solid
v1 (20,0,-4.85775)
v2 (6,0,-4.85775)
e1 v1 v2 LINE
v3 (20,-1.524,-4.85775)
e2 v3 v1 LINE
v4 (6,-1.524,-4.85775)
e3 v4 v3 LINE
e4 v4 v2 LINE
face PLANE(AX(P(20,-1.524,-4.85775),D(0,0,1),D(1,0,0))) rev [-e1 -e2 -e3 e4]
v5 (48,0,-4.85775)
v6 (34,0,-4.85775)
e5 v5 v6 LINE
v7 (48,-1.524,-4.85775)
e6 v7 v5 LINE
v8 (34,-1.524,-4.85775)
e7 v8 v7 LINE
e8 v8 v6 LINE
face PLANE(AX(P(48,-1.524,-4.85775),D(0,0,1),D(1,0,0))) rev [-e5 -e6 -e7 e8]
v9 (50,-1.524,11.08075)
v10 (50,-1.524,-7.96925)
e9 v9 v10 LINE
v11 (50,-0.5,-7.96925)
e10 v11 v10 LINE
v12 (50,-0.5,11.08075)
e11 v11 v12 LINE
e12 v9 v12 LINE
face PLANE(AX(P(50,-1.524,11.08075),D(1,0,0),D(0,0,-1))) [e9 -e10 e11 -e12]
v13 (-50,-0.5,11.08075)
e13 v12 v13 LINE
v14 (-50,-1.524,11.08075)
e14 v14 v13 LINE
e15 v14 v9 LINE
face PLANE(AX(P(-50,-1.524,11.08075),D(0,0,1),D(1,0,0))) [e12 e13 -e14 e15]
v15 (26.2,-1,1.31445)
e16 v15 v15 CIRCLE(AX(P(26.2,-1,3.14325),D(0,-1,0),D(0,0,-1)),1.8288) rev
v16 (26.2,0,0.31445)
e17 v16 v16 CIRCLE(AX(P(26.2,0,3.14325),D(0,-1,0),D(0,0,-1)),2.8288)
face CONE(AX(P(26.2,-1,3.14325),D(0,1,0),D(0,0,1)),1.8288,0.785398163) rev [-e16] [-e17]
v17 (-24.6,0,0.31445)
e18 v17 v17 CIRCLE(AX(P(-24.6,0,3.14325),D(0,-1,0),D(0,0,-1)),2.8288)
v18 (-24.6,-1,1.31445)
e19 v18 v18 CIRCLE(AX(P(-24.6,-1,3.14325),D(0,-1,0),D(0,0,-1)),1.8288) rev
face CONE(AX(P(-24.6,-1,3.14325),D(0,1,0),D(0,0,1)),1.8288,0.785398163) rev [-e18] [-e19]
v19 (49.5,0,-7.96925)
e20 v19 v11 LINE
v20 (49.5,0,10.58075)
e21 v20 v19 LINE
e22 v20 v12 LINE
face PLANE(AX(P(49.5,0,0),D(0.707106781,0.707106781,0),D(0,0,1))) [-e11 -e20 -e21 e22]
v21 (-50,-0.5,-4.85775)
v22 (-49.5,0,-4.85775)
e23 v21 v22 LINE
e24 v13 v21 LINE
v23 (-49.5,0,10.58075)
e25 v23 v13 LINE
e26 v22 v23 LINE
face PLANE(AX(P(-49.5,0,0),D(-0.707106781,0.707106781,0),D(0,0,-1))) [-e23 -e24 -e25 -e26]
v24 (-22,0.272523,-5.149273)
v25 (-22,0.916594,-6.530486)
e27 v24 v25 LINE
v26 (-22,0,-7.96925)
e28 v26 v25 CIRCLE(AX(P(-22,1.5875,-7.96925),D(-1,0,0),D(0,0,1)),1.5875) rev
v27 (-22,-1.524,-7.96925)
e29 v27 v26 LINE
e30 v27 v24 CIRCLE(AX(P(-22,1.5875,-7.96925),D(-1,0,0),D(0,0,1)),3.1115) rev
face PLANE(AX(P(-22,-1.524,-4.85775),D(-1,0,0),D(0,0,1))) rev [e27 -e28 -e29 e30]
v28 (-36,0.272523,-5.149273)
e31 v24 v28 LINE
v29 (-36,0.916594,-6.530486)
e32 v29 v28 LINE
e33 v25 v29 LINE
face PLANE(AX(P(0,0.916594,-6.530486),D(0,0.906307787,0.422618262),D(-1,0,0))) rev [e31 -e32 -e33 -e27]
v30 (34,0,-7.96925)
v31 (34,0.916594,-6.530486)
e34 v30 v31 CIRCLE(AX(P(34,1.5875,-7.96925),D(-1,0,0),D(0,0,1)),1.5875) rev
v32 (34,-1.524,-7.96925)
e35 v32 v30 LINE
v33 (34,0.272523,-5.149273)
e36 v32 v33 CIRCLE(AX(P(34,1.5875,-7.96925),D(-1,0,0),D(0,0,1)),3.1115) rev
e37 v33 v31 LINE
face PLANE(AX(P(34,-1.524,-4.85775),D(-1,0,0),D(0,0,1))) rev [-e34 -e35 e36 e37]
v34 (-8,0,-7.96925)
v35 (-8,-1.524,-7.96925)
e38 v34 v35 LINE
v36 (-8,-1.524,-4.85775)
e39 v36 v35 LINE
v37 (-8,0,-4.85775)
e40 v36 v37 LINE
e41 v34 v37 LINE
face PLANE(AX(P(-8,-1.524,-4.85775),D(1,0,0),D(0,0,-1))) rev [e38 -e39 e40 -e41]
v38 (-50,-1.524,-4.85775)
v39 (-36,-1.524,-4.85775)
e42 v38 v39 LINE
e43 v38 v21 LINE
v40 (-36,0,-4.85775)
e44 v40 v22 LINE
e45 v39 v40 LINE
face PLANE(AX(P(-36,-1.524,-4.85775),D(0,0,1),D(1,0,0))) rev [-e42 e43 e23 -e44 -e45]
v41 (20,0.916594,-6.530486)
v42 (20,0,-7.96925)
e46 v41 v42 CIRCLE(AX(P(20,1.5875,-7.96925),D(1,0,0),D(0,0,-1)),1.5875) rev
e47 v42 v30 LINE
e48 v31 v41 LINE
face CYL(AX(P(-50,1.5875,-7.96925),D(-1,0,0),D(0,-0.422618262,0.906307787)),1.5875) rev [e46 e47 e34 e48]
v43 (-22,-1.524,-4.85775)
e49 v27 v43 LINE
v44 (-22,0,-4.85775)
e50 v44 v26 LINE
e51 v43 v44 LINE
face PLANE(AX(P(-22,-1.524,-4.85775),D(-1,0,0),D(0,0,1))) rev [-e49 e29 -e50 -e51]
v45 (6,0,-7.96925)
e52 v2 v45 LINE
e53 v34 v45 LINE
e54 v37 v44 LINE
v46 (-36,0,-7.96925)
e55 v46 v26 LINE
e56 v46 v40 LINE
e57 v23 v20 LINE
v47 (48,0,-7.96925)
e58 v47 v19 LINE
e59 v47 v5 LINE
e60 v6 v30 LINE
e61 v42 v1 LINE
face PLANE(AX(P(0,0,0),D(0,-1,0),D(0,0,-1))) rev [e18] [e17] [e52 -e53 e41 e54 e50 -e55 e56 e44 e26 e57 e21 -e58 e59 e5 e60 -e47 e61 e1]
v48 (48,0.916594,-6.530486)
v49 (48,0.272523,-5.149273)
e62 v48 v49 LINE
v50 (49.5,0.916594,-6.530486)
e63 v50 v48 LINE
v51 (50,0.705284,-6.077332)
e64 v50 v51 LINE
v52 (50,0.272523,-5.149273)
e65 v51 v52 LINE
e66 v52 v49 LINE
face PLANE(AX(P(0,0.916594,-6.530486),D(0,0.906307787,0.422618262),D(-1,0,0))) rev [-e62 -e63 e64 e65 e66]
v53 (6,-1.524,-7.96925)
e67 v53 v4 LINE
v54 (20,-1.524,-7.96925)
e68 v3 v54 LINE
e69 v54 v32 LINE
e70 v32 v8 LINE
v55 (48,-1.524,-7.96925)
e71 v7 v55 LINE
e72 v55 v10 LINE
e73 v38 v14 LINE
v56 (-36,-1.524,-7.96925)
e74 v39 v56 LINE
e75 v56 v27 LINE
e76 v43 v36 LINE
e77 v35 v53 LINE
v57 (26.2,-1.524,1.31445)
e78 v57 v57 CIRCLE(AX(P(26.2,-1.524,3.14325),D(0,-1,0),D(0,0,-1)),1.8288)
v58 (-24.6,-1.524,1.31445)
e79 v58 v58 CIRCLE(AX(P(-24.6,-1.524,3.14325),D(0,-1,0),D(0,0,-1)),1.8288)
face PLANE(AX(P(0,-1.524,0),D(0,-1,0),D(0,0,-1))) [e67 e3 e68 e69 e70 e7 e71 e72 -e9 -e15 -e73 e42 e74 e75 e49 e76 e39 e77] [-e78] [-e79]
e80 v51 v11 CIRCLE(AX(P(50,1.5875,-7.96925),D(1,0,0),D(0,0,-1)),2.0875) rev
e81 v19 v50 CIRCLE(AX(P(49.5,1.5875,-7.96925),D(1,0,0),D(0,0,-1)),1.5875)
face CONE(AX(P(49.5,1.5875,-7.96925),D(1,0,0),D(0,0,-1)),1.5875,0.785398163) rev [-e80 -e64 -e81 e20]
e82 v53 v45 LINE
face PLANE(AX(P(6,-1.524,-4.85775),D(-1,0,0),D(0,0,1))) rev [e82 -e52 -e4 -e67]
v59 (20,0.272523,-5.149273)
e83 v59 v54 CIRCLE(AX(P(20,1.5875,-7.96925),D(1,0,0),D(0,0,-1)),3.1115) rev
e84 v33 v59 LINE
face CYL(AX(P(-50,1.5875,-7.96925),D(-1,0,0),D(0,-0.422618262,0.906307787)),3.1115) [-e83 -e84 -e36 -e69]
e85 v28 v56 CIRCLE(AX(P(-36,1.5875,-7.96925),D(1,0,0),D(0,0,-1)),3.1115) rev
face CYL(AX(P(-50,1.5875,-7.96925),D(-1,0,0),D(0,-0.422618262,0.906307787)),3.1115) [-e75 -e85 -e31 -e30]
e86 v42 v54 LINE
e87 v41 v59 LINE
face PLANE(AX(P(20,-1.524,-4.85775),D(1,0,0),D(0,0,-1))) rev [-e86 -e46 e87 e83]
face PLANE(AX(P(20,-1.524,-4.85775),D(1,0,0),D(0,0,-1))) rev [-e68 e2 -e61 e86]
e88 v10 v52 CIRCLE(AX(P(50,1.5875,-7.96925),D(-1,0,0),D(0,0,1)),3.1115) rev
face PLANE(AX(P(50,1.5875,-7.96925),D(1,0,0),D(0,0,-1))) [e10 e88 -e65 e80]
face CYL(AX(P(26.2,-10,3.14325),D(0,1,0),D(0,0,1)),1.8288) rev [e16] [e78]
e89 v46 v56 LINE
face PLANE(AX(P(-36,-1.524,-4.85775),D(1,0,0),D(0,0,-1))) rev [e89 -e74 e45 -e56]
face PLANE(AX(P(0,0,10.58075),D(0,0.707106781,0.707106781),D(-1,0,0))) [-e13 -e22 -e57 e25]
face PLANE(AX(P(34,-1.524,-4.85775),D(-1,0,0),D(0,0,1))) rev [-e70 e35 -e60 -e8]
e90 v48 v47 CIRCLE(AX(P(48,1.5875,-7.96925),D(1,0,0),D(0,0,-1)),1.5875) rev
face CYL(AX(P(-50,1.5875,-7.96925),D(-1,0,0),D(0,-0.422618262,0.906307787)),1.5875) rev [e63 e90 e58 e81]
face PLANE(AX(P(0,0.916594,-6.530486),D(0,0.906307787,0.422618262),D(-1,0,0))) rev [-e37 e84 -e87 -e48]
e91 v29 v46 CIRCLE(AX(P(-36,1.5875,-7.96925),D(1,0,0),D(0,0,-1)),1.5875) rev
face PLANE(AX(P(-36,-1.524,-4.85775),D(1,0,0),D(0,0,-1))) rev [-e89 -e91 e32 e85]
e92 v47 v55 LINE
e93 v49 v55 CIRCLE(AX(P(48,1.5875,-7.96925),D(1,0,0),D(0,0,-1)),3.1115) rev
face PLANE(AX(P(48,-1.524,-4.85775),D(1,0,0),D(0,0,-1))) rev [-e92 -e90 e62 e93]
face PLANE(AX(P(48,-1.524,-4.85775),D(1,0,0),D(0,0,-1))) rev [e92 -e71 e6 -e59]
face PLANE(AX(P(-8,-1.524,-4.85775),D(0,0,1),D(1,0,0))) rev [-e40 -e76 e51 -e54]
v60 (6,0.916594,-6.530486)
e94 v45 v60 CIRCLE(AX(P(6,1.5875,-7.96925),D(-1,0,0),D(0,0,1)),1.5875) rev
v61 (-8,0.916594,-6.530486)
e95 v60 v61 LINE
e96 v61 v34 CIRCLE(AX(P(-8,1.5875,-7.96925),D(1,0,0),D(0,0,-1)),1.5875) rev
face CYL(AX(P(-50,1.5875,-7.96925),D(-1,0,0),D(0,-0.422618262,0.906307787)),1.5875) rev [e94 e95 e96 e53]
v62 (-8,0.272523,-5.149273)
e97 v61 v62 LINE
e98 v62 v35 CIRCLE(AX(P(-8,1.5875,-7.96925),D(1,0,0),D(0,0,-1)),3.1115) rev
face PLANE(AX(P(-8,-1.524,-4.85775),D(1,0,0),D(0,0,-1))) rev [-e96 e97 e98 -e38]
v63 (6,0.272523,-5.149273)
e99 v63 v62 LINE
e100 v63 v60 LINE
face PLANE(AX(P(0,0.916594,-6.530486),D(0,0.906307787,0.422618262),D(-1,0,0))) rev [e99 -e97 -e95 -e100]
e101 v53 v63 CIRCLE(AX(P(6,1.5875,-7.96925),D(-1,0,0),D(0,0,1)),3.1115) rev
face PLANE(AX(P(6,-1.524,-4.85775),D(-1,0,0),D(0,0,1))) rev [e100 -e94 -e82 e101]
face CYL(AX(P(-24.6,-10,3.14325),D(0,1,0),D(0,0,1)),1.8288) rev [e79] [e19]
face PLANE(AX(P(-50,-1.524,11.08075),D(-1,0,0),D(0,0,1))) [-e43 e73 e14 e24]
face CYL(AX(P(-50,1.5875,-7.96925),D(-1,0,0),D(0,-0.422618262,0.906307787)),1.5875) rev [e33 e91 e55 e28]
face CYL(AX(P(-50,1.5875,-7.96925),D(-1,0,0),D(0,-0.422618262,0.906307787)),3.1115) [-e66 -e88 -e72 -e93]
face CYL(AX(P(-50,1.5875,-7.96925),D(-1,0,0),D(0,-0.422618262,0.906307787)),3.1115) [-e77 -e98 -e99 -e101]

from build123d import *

# Parameters (mm, degrees)
SKETCH1_W          = 100
SKETCH1_H          = 22.1615
BASE_FLANGE1_DEPTH = 1.524
HEM1_START         = -50
HEM1_DEPTH         = 100
HEM1_2_DEPTH       = 100
CUT_EXTRUDE1_START = -52.42823759
SKETCH8_W          = 14
SKETCH8_H          = 6.223
CUT_EXTRUDE1_DEPTH = 94.856475179
LPATTERN1_COUNT    = 11
LPATTERN1_PITCH    = 28
CHAMFER1_SIZE      = 0.5
SKETCH9_R          = 1.8288
CUT_EXTRUDE2_DEPTH = 10
LPATTERN2_COUNT    = 6
LPATTERN2_PITCH    = 50.8
CHAMFER2_SIZE      = 1


# Read off the part's stored shape, not the designer's step: Hem1
# Sheet-metal steps are written as plain solids
with BuildPart() as part:
    # Sketch1 → Base-Flange1 (new body)
    with BuildSketch(Plane(origin=(0, 0, 0), x_dir=(1, 0, 0), z_dir=(0, 1, 0))):
        Rectangle(SKETCH1_W, SKETCH1_H)
    extrude(amount=-BASE_FLANGE1_DEPTH)

    # Hem1 outline → Hem1 (cut)
    with BuildSketch(Plane.YZ.offset(HEM1_START)):
        with BuildLine():
            Line((0, -11.08075), (0, -10.645306054))
            ThreePointArc((0, -10.645306054), (-1.116287945, -9.509043168), (-1.524, -7.96925))
            Line((-1.524, -7.96925), (-1.524, -11.08075))
            Line((-1.524, -11.08075), (0, -11.08075))
        make_face()
    extrude(amount=HEM1_DEPTH, mode=Mode.SUBTRACT)

    # Hem1 2 outline → Hem1 2 (add)
    with BuildSketch(Plane.YZ.offset(HEM1_START)):
        with BuildLine():
            Line((0.272523279, -5.149273321), (0.916593509, -6.530486388))
            ThreePointArc((0.916593509, -6.530486388), (2.92638392, -8.822213128), (0, -7.96925))
            Line((0, -7.96925), (0, -10.645306054))
            ThreePointArc((0, -10.645306054), (4.69518189, -8.123345818), (0.272523279, -5.149273321))
        make_face()
    extrude(amount=HEM1_2_DEPTH)

    # Sketch8 → Cut-Extrude1 (cut)
    with BuildSketch(Plane(origin=(0, 0, 0), x_dir=(1, 0, 0), z_dir=(0, 1, 0)).offset(CUT_EXTRUDE1_START)):
        with Locations((-43, 7.96925)):
            Rectangle(SKETCH8_W, SKETCH8_H)
    cut_extrude1 = extrude(amount=CUT_EXTRUDE1_DEPTH, mode=Mode.SUBTRACT)

    # LPattern1: Cut-Extrude1 ×11
    with Locations(*[(i * LPATTERN1_PITCH, 0, 0) for i in range(1, LPATTERN1_COUNT)]):
        add(cut_extrude1, mode=Mode.SUBTRACT)

    # Chamfer1
    chamfer1_edges = [part.edges().sort_by_distance(p)[0] for p in [
        (50, 2.92638392, -8.822213128),
        (-50, 0, 3.1115),
        (0, 0, 11.08075),
        (50, 0, 1.55575),
    ]]
    chamfer(chamfer1_edges, length=CHAMFER1_SIZE)

    # Sketch9 → Cut-Extrude2 (cut)
    with BuildSketch(Plane(origin=(0, 0, 0), x_dir=(1, 0, 0), z_dir=(0, 1, 0))):
        with Locations(Location((-24.6, -3.14325, 0), (0, 0, 270))):
            Circle(SKETCH9_R)
    cut_extrude2 = extrude(amount=-CUT_EXTRUDE2_DEPTH, mode=Mode.SUBTRACT)

    # LPattern2: Cut-Extrude2 ×6
    with Locations(*[(i * LPATTERN2_PITCH, 0, 0) for i in range(1, LPATTERN2_COUNT)]):
        add(cut_extrude2, mode=Mode.SUBTRACT)

    # Chamfer2
    chamfer2_edges = [part.edges().sort_by_distance(p)[0] for p in [
        (-24.6, 0, 1.31445),
        (26.2, 0, 1.31445),
    ]]
    chamfer(chamfer2_edges, length=CHAMFER2_SIZE)


solid = part.part
